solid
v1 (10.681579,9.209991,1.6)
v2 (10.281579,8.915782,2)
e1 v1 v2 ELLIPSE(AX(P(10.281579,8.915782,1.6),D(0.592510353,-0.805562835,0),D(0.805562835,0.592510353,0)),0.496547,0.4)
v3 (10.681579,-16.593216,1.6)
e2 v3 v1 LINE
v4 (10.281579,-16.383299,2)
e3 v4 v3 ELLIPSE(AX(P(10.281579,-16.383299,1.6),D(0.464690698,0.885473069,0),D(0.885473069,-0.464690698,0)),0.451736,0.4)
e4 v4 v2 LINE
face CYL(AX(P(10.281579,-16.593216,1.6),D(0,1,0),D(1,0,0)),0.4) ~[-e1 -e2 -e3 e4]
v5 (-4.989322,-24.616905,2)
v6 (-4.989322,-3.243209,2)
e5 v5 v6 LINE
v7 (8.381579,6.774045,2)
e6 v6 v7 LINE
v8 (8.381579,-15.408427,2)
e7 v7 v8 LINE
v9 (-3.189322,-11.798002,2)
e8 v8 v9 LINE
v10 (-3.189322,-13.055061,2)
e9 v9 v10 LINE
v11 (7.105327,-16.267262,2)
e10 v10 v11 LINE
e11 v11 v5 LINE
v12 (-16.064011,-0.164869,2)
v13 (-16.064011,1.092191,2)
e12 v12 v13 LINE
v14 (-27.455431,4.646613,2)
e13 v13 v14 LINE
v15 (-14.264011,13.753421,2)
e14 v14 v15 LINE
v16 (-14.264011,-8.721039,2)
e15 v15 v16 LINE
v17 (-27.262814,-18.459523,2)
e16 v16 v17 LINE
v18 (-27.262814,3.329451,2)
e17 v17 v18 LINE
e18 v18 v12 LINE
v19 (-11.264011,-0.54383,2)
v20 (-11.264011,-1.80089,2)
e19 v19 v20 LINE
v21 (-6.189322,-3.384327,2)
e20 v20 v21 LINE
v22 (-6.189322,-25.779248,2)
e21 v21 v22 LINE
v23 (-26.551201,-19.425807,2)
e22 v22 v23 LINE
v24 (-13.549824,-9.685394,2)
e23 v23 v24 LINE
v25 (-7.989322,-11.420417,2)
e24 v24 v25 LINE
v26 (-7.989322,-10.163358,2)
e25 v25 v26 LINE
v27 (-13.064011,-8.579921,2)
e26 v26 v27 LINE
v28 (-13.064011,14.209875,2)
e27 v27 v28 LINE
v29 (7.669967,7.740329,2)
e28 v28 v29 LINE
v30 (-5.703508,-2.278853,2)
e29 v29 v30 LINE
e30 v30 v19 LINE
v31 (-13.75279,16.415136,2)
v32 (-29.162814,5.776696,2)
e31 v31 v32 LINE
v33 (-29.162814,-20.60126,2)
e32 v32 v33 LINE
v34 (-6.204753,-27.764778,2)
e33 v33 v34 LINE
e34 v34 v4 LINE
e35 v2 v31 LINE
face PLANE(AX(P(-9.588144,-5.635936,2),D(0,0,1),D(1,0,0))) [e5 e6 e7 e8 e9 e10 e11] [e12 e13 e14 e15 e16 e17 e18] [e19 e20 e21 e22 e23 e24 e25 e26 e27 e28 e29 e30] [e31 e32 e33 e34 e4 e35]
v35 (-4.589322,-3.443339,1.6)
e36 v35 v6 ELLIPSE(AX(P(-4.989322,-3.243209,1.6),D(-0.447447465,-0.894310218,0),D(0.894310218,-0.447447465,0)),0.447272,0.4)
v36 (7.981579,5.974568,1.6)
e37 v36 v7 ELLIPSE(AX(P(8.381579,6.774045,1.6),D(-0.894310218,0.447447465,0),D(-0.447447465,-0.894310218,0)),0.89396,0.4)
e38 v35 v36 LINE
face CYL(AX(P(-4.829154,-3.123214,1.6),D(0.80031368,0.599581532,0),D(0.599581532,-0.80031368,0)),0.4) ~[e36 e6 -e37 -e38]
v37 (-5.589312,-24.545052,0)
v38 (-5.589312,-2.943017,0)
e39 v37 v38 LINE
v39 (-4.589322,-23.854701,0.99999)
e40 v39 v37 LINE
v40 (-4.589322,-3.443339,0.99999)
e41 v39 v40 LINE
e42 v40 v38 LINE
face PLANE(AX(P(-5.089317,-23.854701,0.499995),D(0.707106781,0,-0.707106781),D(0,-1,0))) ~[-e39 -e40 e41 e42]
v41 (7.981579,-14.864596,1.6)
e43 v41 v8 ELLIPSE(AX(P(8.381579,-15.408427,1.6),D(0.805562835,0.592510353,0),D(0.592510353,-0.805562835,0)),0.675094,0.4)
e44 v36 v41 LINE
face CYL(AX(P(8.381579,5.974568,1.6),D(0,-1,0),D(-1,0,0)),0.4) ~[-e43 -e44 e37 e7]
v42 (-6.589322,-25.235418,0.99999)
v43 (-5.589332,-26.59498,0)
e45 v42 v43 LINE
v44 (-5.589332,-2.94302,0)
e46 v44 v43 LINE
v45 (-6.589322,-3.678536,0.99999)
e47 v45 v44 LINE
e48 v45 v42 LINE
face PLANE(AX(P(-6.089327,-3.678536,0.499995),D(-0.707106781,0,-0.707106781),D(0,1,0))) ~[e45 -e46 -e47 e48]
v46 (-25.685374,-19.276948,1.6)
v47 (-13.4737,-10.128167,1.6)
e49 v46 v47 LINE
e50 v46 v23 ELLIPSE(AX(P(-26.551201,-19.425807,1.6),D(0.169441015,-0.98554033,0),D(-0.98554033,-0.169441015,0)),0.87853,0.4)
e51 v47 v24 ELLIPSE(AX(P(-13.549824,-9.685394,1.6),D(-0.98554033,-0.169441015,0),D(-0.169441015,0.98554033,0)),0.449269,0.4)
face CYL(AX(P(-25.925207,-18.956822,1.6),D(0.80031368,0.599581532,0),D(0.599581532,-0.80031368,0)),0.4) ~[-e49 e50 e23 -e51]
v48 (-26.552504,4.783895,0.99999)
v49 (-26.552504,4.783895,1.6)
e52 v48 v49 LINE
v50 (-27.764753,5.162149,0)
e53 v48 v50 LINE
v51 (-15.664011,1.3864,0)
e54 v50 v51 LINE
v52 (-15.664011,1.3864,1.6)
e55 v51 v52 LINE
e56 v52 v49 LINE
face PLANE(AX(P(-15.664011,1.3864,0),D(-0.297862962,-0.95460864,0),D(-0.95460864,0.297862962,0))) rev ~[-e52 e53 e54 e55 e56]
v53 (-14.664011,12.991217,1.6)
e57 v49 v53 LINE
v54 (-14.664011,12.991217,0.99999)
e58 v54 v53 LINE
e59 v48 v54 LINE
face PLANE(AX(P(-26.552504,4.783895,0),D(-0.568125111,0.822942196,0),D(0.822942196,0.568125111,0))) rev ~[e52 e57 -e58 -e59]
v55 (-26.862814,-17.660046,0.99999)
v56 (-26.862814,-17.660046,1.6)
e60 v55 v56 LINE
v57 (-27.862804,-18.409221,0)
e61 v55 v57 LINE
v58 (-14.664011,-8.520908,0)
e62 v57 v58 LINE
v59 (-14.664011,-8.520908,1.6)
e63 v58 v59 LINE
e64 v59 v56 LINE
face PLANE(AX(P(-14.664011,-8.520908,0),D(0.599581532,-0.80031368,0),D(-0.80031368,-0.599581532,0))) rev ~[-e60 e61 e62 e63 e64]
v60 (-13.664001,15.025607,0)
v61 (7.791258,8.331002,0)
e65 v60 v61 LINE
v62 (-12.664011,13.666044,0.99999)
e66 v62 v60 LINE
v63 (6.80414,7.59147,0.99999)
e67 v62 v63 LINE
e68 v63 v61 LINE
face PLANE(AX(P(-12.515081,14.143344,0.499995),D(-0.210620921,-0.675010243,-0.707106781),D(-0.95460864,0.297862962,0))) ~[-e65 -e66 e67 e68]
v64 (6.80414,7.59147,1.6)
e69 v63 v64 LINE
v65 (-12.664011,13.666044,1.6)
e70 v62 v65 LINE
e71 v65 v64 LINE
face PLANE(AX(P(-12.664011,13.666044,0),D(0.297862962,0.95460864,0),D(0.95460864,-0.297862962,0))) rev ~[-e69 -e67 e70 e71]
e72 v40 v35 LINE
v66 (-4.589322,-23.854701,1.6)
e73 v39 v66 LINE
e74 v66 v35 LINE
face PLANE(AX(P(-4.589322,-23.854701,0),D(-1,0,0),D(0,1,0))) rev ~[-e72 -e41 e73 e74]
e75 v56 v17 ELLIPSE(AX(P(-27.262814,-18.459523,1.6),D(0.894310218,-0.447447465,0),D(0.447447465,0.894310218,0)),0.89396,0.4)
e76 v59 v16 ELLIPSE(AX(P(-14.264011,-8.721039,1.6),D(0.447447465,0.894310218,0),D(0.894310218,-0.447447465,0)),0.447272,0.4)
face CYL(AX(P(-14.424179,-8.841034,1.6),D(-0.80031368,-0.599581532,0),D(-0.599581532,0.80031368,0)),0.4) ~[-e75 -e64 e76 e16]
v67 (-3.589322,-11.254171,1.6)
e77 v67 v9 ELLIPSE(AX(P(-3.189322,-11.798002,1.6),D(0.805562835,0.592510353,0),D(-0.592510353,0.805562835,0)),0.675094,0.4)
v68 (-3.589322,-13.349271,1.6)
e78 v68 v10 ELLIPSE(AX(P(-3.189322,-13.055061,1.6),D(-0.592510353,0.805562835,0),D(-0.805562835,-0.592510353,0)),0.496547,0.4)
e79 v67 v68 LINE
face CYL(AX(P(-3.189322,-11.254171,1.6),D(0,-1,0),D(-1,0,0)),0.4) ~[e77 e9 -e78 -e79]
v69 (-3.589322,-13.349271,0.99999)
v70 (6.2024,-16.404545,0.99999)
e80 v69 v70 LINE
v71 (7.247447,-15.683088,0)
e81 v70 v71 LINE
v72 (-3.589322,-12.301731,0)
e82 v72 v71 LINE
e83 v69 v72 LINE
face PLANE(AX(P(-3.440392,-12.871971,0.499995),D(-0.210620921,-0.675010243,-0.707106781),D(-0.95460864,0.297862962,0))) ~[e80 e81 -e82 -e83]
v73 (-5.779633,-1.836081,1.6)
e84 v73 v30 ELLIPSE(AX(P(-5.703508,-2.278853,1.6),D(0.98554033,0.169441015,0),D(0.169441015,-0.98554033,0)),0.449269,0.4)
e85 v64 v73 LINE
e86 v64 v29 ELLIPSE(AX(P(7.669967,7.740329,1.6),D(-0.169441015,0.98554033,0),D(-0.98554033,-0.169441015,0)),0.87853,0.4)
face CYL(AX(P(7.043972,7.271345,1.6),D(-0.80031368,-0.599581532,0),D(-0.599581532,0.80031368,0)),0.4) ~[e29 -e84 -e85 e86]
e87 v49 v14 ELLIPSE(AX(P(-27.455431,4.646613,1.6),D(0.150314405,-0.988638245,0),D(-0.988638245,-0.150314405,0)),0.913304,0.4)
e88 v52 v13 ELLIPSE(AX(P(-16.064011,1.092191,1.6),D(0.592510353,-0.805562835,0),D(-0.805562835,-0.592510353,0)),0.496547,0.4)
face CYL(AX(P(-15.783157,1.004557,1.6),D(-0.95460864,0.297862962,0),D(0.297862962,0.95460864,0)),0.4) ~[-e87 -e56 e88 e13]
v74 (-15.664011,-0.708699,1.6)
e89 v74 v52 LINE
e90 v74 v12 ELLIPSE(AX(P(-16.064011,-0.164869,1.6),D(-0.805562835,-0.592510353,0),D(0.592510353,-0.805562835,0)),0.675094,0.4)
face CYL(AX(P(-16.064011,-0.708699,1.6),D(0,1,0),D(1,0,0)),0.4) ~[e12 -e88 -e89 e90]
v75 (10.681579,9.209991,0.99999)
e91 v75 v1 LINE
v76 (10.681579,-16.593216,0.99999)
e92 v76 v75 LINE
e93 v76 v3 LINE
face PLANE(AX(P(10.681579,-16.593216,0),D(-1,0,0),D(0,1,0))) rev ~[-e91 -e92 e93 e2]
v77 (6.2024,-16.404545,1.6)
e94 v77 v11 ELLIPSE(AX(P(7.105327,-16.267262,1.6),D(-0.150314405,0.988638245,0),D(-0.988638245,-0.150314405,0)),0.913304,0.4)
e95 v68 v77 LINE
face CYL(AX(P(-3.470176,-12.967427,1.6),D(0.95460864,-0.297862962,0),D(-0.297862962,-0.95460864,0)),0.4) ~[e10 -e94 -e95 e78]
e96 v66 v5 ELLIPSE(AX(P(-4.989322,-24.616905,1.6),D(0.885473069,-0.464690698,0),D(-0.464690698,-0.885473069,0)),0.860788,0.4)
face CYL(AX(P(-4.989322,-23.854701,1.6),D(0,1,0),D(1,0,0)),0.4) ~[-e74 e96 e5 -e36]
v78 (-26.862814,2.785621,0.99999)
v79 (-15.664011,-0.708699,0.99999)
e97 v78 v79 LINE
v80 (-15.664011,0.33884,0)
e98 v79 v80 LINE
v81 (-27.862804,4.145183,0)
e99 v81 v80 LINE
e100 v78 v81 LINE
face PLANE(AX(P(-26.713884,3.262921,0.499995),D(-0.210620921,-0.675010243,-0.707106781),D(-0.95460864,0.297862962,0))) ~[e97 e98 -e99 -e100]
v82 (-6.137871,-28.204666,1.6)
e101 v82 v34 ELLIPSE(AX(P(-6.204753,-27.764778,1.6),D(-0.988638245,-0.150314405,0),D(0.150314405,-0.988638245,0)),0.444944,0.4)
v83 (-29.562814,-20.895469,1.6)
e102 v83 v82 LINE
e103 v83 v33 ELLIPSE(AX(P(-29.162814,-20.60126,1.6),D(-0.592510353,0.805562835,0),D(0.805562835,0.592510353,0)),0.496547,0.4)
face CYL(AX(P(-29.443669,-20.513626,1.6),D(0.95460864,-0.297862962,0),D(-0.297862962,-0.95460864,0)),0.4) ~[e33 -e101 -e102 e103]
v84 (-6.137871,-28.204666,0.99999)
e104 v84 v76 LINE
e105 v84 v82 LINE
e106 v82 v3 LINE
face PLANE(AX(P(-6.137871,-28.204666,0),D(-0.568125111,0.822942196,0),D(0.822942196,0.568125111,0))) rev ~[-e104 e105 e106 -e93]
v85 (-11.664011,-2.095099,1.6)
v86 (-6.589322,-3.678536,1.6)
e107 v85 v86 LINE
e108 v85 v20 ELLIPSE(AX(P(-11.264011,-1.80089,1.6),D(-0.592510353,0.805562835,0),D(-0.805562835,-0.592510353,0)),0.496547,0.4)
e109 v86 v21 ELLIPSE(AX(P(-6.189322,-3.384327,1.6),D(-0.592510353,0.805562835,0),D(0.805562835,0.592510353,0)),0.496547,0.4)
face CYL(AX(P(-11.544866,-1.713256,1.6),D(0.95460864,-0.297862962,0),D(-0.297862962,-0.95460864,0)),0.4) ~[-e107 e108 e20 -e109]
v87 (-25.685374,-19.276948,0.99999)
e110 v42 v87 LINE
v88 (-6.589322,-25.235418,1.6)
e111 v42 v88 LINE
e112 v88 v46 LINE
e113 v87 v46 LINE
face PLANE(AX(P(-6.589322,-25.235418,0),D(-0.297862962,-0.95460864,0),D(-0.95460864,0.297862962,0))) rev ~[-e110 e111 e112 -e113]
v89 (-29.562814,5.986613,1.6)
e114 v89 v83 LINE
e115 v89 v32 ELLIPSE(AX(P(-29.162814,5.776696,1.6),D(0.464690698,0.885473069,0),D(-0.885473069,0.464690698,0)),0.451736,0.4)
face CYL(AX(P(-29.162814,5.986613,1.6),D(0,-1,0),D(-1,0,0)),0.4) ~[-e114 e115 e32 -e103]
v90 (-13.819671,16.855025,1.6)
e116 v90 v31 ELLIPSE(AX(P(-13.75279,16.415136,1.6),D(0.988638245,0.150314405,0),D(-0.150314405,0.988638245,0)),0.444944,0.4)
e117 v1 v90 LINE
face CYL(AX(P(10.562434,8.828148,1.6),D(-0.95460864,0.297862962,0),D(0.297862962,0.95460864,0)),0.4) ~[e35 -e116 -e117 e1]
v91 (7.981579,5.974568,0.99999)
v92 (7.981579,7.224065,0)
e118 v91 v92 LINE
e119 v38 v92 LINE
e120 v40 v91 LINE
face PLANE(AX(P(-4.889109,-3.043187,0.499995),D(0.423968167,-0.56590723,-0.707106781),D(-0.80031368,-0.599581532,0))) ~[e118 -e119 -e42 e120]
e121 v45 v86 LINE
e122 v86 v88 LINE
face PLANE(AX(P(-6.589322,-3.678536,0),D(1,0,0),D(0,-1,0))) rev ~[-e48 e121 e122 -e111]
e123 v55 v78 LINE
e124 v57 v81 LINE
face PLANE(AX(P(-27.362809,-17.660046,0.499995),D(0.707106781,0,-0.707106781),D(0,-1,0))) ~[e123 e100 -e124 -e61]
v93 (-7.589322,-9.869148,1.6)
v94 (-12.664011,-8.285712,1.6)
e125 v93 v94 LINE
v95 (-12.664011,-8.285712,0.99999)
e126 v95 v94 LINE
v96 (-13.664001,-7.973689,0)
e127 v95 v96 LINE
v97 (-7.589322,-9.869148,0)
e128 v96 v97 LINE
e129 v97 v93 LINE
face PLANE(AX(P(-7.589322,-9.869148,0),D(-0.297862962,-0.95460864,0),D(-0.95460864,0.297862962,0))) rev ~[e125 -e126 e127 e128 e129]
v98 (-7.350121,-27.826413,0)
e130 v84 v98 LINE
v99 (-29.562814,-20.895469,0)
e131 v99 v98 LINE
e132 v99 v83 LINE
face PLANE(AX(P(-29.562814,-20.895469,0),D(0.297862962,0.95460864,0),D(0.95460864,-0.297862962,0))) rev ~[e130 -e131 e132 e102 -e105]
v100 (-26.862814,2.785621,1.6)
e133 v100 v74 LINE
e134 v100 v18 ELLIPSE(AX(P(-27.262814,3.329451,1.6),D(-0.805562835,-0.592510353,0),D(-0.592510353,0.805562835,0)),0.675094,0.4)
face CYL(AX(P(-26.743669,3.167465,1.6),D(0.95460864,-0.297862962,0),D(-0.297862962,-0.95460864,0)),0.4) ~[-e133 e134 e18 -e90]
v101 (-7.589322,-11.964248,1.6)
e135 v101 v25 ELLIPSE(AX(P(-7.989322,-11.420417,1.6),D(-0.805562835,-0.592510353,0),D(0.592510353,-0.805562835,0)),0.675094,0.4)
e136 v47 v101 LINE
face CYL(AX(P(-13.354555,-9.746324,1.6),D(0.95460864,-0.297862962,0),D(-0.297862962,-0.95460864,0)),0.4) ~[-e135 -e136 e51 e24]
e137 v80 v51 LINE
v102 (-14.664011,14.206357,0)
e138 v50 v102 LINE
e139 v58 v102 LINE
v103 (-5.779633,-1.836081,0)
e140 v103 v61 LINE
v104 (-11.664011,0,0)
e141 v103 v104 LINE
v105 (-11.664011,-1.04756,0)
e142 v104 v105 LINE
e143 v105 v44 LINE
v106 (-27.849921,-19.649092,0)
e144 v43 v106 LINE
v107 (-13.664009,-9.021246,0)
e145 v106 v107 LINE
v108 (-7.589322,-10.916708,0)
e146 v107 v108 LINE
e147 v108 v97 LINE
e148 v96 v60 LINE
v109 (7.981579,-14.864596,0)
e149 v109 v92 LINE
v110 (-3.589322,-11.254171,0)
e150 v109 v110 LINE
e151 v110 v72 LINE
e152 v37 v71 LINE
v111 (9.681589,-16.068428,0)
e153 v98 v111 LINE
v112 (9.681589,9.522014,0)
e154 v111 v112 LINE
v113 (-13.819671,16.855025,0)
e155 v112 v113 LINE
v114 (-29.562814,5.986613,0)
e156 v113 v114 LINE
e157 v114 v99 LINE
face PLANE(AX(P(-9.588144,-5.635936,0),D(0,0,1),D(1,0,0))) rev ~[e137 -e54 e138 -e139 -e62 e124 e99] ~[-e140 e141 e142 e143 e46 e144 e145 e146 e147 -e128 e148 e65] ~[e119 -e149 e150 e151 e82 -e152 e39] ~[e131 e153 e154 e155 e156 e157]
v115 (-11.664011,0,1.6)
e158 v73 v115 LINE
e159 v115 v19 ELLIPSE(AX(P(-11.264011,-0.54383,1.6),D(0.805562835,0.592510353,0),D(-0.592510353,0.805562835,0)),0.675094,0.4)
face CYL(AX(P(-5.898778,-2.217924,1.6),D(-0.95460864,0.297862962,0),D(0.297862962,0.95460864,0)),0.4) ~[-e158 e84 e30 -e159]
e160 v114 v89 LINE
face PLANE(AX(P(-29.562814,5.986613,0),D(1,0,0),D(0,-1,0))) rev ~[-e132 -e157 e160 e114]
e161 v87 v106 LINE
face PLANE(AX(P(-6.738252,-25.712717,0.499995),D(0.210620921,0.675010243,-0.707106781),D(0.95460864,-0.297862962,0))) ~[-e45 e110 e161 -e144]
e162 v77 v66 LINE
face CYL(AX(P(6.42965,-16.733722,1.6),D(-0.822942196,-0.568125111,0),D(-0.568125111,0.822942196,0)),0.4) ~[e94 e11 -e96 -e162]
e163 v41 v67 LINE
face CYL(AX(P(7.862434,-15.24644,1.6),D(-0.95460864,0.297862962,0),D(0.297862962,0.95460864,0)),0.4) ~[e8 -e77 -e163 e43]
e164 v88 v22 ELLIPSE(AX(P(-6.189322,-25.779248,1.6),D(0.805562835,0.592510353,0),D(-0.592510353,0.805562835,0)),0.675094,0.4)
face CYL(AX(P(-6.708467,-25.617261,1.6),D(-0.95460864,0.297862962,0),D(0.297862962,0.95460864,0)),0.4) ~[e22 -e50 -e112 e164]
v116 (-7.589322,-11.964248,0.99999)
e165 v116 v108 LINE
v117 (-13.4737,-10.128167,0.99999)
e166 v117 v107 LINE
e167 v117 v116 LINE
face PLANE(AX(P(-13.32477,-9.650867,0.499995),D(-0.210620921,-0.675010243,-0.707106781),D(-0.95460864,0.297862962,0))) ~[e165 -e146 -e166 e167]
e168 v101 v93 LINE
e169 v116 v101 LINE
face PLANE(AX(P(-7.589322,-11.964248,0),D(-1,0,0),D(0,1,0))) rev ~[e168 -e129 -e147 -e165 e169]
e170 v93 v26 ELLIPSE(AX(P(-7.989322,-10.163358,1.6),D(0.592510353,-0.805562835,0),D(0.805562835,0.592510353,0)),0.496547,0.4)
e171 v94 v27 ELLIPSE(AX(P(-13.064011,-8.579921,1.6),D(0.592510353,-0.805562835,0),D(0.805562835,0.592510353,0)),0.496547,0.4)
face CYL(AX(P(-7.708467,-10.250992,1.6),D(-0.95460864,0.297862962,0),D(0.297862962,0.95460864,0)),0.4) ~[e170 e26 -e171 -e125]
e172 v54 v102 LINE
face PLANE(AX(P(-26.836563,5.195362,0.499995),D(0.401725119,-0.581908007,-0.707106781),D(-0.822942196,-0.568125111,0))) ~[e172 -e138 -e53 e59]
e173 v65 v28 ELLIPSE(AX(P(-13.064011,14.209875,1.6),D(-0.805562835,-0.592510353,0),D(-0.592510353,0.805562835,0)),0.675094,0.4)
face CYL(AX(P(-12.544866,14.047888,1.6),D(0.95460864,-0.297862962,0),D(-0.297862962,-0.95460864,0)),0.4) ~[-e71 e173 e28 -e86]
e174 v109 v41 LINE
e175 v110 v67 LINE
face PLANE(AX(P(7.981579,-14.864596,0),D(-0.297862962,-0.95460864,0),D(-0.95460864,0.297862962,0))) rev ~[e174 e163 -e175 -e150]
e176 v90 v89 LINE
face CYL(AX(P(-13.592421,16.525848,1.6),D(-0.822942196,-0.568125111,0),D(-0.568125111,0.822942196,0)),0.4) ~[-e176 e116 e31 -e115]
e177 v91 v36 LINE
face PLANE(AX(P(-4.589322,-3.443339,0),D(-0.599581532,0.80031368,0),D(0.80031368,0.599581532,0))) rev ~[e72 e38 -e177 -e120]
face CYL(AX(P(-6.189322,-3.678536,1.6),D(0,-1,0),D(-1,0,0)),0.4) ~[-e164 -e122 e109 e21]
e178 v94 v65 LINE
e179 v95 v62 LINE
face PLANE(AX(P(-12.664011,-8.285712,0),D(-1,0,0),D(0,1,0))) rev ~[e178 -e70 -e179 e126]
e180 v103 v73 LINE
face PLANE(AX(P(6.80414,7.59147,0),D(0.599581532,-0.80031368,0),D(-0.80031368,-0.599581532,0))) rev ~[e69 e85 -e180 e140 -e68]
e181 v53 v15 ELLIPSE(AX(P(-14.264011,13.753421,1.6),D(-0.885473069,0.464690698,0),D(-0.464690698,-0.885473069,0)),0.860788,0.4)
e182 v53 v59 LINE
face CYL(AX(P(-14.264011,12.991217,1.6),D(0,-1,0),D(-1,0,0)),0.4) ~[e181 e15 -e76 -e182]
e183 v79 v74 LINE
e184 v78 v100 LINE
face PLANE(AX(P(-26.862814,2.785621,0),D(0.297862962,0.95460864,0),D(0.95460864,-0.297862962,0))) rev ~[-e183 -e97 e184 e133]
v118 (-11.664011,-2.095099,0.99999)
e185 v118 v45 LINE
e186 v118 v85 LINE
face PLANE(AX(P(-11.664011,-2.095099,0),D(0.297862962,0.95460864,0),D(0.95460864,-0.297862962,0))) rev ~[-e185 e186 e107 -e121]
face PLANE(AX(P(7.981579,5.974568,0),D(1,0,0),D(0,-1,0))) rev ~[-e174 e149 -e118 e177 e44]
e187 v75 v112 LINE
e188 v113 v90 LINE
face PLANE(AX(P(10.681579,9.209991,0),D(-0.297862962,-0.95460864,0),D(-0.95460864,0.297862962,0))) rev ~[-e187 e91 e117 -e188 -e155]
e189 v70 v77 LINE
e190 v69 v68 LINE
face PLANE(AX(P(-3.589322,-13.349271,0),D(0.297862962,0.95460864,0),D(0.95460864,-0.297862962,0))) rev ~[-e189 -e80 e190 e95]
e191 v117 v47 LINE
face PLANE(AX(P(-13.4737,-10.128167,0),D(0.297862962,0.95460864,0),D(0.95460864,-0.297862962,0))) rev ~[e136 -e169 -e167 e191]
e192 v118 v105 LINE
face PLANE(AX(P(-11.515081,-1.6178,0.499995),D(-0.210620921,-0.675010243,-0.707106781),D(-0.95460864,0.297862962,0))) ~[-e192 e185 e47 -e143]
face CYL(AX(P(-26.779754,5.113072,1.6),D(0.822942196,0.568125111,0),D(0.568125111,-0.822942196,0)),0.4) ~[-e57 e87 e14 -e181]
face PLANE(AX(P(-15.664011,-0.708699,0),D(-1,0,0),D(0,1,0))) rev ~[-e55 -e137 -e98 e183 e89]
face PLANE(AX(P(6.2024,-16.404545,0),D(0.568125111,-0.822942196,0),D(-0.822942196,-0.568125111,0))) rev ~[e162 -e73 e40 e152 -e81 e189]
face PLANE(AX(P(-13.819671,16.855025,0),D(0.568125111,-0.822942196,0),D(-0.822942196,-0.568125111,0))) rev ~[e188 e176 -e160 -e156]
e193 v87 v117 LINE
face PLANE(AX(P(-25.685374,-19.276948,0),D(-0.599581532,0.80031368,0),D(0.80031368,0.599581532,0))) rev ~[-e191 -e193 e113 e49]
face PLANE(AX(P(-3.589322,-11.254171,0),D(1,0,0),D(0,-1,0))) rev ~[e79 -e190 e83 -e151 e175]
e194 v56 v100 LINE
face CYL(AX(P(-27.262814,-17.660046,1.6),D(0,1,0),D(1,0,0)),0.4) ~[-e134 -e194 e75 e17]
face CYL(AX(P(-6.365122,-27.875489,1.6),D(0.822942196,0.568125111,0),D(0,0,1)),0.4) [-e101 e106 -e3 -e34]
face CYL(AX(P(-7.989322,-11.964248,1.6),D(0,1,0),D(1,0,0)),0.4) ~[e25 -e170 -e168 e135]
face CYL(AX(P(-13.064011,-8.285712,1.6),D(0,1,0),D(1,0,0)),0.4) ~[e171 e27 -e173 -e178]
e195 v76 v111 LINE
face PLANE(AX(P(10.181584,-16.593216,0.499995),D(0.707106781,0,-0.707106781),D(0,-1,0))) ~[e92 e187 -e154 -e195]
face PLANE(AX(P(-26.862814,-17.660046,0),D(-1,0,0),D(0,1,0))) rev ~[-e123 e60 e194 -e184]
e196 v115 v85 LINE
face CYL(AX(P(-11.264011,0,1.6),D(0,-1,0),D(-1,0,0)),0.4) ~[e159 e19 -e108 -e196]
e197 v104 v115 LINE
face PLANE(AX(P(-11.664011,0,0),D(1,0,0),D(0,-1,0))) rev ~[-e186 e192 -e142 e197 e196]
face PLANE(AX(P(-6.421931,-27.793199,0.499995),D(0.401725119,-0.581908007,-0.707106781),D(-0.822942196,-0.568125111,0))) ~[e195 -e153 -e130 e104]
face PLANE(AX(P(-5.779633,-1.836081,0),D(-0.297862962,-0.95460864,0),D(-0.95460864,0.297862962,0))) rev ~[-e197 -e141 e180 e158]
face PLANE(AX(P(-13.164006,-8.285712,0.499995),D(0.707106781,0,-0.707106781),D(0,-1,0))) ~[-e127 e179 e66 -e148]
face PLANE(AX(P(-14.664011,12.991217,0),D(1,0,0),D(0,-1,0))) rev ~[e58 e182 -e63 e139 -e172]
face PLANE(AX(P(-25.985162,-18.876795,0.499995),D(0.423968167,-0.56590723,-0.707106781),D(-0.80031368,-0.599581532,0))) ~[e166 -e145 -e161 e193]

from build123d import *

# Parameters (mm, degrees)
F1_DEPTH = 2
F2_SIZE  = 0.99999
F3_R     = 0.4


# Not quite as in the source:
# - a fillet or chamfer is up to 0.001 mm smaller than in the source, because OpenCascade refuses the exact size
# - a feature names something its author has since deleted; it is built from what else it names


with BuildPart() as f1:
    # F0 (on Top) → F1 (new body)
    with BuildSketch(Plane.XY):
        Polygon((-13.8196714956, 16.8550248196), (-29.5628140081, 5.986613122), (-29.5628140081, -20.895469086), (-6.1378714726, -28.2046662626), (10.6815792442, -16.5932160853), (10.6815792442, 9.2099912209), align=None)
        Polygon((-5.5893215574, -24.5450593134), (-6.5893215574, -25.2354177783), (-25.6853743411, -19.2769478747), (-26.8628140101, -18.9095557801), (-26.8628140101, -17.6600457129), (-26.8628140101, 2.7856210558), (-26.8628140101, 4.569670104), (-26.5525036512, 4.783895487), (-14.6640113722, 12.9912167666), (-13.6640113722, 13.6815752315), (-13.3682214107, 13.8857763353), (-12.6640113722, 13.6660443117), (6.8041395773, 7.5914700096), (7.9815792463, 7.224077915), (7.9815792463, 5.9745678478), (7.9815792463, -14.864596124), (7.9815792463, -15.1762730673), (7.5702731242, -15.4602217303), (6.2023996294, -16.4045447763), (-4.5893215574, -23.8547008485), align=None, mode=Mode.SUBTRACT)
        Polygon((-26.8628140101, 4.569670104), (-26.8628140101, 2.7856210558), (-15.6640113722, -0.7086994318), (-15.6640113722, 1.3863999797), (-26.5525036512, 4.783895487), align=None)
        with BuildLine():
            Line((-13.6640113722, 13.6815752315), (-13.6640113722, -8.0212351043))
            ThreePointArc((-13.6640113722, -8.0212351043), (-13.5133605177, -8.0326480722), (-13.3661484098, -8.0666264642))
            Line((-13.3661484098, -8.0666264642), (-12.6640113722, -8.2857116571))
            Line((-12.6640113722, -8.2857116571), (-12.6640113722, 13.6660443117))
            Line((-12.6640113722, 13.6660443117), (-13.3682214107, 13.8857763353))
            Line((-13.3682214107, 13.8857763353), (-13.6640113722, 13.6815752315))
        make_face()
        with BuildLine():
            Line((-14.6640113722, 12.9912167666), (-14.6640113722, -8.5209081976))
            Line((-14.6640113722, -8.5209081976), (-14.2635929044, -8.2209214243))
            ThreePointArc((-14.2635929044, -8.2209214243), (-13.9799910551, -8.0724691479), (-13.6640113722, -8.0212351043))
            Line((-13.6640113722, -8.0212351043), (-13.6640113722, 13.6815752315))
            Line((-13.6640113722, 13.6815752315), (-14.6640113722, 12.9912167666))
        make_face()
        with BuildLine():
            Line((-6.5893215574, -3.6785358878), (-6.5893215574, -25.2354177783))
            Line((-6.5893215574, -25.2354177783), (-5.5893215574, -24.5450593134))
            Line((-5.5893215574, -24.5450593134), (-5.5893215574, -3.9430124406))
            ThreePointArc((-5.5893215574, -3.9430124406), (-5.739972412, -3.9315994727), (-5.8871845198, -3.8976210807))
            Line((-5.8871845198, -3.8976210807), (-6.5893215574, -3.6785358878))
        make_face()
        with BuildLine():
            Line((-5.5893215574, -3.9430124406), (-5.5893215574, -24.5450593134))
            Line((-5.5893215574, -24.5450593134), (-4.5893215574, -23.8547008485))
            Line((-4.5893215574, -23.8547008485), (-4.5893215574, -3.4433393473))
            Line((-4.5893215574, -3.4433393473), (-4.9897400253, -3.7433261206))
            ThreePointArc((-4.9897400253, -3.7433261206), (-5.2733418745, -3.891778397), (-5.5893215574, -3.9430124406))
        make_face()
        with BuildLine():
            ThreePointArc((-5.2914585951, -1.9884038006), (-5.0122521974, -2.1263172994), (-4.7890078775, -2.3434309085))
            Line((-4.7890078775, -2.3434309085), (7.9815792463, 7.224077915))
            Line((7.9815792463, 7.224077915), (6.8041395773, 7.5914700096))
            Line((6.8041395773, 7.5914700096), (-5.7796330622, -1.8360805481))
            Line((-5.7796330622, -1.8360805481), (-5.2914585951, -1.9884038006))
        make_face()
        with BuildLine():
            Line((-4.5893215574, -2.9430124406), (-4.5893215574, -3.4433393473))
            Line((-4.5893215574, -3.4433393473), (7.9815792463, 5.9745678478))
            Line((7.9815792463, 5.9745678478), (7.9815792463, 7.224077915))
            Line((7.9815792463, 7.224077915), (-4.7890078775, -2.3434309085))
            ThreePointArc((-4.7890078775, -2.3434309085), (-4.6405556011, -2.6270327577), (-4.5893215574, -2.9430124406))
        make_face()
        with BuildLine():
            Line((-26.8628140101, -18.9095557801), (-25.6853743411, -19.2769478747))
            Line((-25.6853743411, -19.2769478747), (-13.4736998674, -10.1281669968))
            Line((-13.4736998674, -10.1281669968), (-13.9618743346, -9.9758437443))
            ThreePointArc((-13.9618743346, -9.9758437443), (-14.2410807322, -9.8379302455), (-14.4643250521, -9.6208166364))
            Line((-14.4643250521, -9.6208166364), (-26.8628140101, -18.9095557801))
        make_face()
        with BuildLine():
            Line((-26.8628140101, -17.6600457129), (-26.8628140101, -18.9095557801))
            Line((-26.8628140101, -18.9095557801), (-14.4643250521, -9.6208166364))
            ThreePointArc((-14.4643250521, -9.6208166364), (-14.6127773286, -9.3372147872), (-14.6640113722, -9.0212351043))
            Line((-14.6640113722, -9.0212351043), (-14.6640113722, -8.5209081976))
            Line((-14.6640113722, -8.5209081976), (-26.8628140101, -17.6600457129))
        make_face()
        Polygon((-3.5893215574, -13.3492706494), (6.2023996294, -16.4045447763), (7.5702731242, -15.4602217303), (-3.5893215574, -11.9781351546), align=None)
        with BuildLine():
            Line((-11.6640113722, -2.0950994115), (-6.5893215574, -3.6785358878))
            Line((-6.5893215574, -3.6785358878), (-6.5893215574, -2.9430124406))
            ThreePointArc((-6.5893215574, -2.9430124406), (-6.4836317755, -2.4955649757), (-6.1889030896, -2.1426987607))
            Line((-6.1889030896, -2.1426987607), (-5.7796330622, -1.8360805481))
            Line((-5.7796330622, -1.8360805481), (-11.6640113722, 0))
            Line((-11.6640113722, 0), (-11.6640113722, -2.0950994115))
        make_face()
        with BuildLine():
            Line((-13.06442984, -9.8215487842), (-13.4736998674, -10.1281669968))
            Line((-13.4736998674, -10.1281669968), (-7.5893215574, -11.9642475449))
            Line((-7.5893215574, -11.9642475449), (-7.5893215574, -9.8691481334))
            Line((-7.5893215574, -9.8691481334), (-12.6640113722, -8.2857116571))
            Line((-12.6640113722, -8.2857116571), (-12.6640113722, -9.0212351043))
            ThreePointArc((-12.6640113722, -9.0212351043), (-12.7697011542, -9.4686825693), (-13.06442984, -9.8215487842))
        make_face()
        Polygon((-3.5893215574, -11.9781351546), (7.5702731242, -15.4602217303), (7.9815792463, -15.1762730673), (7.9815792463, -14.864596124), (-3.5893215574, -11.2541712379), align=None)
        with BuildLine():
            ThreePointArc((-5.8871845198, -3.8976210807), (-5.739972412, -3.9315994727), (-5.5893215574, -3.9430124406))
            Line((-5.5893215574, -3.9430124406), (-5.5893215574, -2.9430124406))
            Line((-5.5893215574, -2.9430124406), (-4.7890078775, -2.3434309085))
            ThreePointArc((-4.7890078775, -2.3434309085), (-5.0122521974, -2.1263172994), (-5.2914585951, -1.9884038006))
            ThreePointArc((-5.2914585951, -1.9884038006), (-5.7587625723, -1.9574721104), (-6.1889030896, -2.1426987607))
            ThreePointArc((-6.1889030896, -2.1426987607), (-6.4836317755, -2.4955649757), (-6.5893215574, -2.9430124406))
            ThreePointArc((-6.5893215574, -2.9430124406), (-6.3948843925, -3.535522794), (-5.8871845198, -3.8976210807))
        make_face()
        with BuildLine():
            Line((-13.6640113722, -9.0212351043), (-14.4643250521, -9.6208166364))
            ThreePointArc((-14.4643250521, -9.6208166364), (-14.2410807322, -9.8379302455), (-13.9618743346, -9.9758437443))
            ThreePointArc((-13.9618743346, -9.9758437443), (-13.4945703573, -10.0067754345), (-13.06442984, -9.8215487842))
            ThreePointArc((-13.06442984, -9.8215487842), (-12.7697011542, -9.4686825693), (-12.6640113722, -9.0212351043))
            ThreePointArc((-12.6640113722, -9.0212351043), (-12.8584485372, -8.4287247509), (-13.3661484098, -8.0666264642))
            ThreePointArc((-13.3661484098, -8.0666264642), (-13.5133605177, -8.0326480722), (-13.6640113722, -8.0212351043))
            Line((-13.6640113722, -8.0212351043), (-13.6640113722, -9.0212351043))
        make_face()
        with BuildLine():
            Line((-5.5893215574, -2.9430124406), (-5.5893215574, -3.9430124406))
            ThreePointArc((-5.5893215574, -3.9430124406), (-5.2733418745, -3.891778397), (-4.9897400253, -3.7433261206))
            ThreePointArc((-4.9897400253, -3.7433261206), (-4.6950113394, -3.3904599056), (-4.5893215574, -2.9430124406))
            ThreePointArc((-4.5893215574, -2.9430124406), (-4.6405556011, -2.6270327577), (-4.7890078775, -2.3434309085))
            Line((-4.7890078775, -2.3434309085), (-5.5893215574, -2.9430124406))
        make_face()
        with BuildLine():
            ThreePointArc((-14.6640113722, -9.0212351043), (-14.6127773286, -9.3372147872), (-14.4643250521, -9.6208166364))
            Line((-14.4643250521, -9.6208166364), (-13.6640113722, -9.0212351043))
            Line((-13.6640113722, -9.0212351043), (-13.6640113722, -8.0212351043))
            ThreePointArc((-13.6640113722, -8.0212351043), (-13.9799910551, -8.0724691479), (-14.2635929044, -8.2209214243))
            ThreePointArc((-14.2635929044, -8.2209214243), (-14.5583215902, -8.5737876393), (-14.6640113722, -9.0212351043))
        make_face()
        with BuildLine():
            Line((-6.5893215574, -2.9430124406), (-6.5893215574, -3.6785358878))
            Line((-6.5893215574, -3.6785358878), (-5.8871845198, -3.8976210807))
            ThreePointArc((-5.8871845198, -3.8976210807), (-6.3948843925, -3.535522794), (-6.5893215574, -2.9430124406))
        make_face()
        with BuildLine():
            ThreePointArc((-13.3661484098, -8.0666264642), (-12.8584485372, -8.4287247509), (-12.6640113722, -9.0212351043))
            Line((-12.6640113722, -9.0212351043), (-12.6640113722, -8.2857116571))
            Line((-12.6640113722, -8.2857116571), (-13.3661484098, -8.0666264642))
        make_face()
        with BuildLine():
            Line((-13.9618743346, -9.9758437443), (-13.4736998674, -10.1281669968))
            Line((-13.4736998674, -10.1281669968), (-13.06442984, -9.8215487842))
            ThreePointArc((-13.06442984, -9.8215487842), (-13.4945703573, -10.0067754345), (-13.9618743346, -9.9758437443))
        make_face()
        with BuildLine():
            Line((-5.7796330622, -1.8360805481), (-6.1889030896, -2.1426987607))
            ThreePointArc((-6.1889030896, -2.1426987607), (-5.7587625723, -1.9574721104), (-5.2914585951, -1.9884038006))
            Line((-5.2914585951, -1.9884038006), (-5.7796330622, -1.8360805481))
        make_face()
        with BuildLine():
            Line((-4.9897400253, -3.7433261206), (-4.5893215574, -3.4433393473))
            Line((-4.5893215574, -3.4433393473), (-4.5893215574, -2.9430124406))
            ThreePointArc((-4.5893215574, -2.9430124406), (-4.6950113394, -3.3904599056), (-4.9897400253, -3.7433261206))
        make_face()
        with BuildLine():
            Line((-14.2635929044, -8.2209214243), (-14.6640113722, -8.5209081976))
            Line((-14.6640113722, -8.5209081976), (-14.6640113722, -9.0212351043))
            ThreePointArc((-14.6640113722, -9.0212351043), (-14.5583215902, -8.5737876393), (-14.2635929044, -8.2209214243))
        make_face()
    extrude(amount=F1_DEPTH)

    # F2 (size 1 in the source; OpenCascade refuses exactly that, so slightly less here)
    f2_edges = [f1.edges().sort_by_distance(p)[0] for p in [
        (-6.589322, -14.456977, 0),
        (-12.664011, 2.690166, 0),
        (-20.608258, 8.887556, 0),
        (-26.862814, -7.437212, 0),
        (-21.263413, 1.038461, 0),
        (-19.579537, -14.702557, 0),
        (1.306539, -14.876908, 0),
        (-10.531511, -11.046207, 0),
        (-9.126666, -2.886818, 0),
        (-4.589322, -13.64902, 0),
        (1.696129, 1.265614, 0),
        (10.681579, -3.691612, 0),
        (-2.929936, 10.628757, 0),
        (2.271854, -22.398941, 0),
        (-16.137348, -22.256183, 0),
    ]]
    chamfer(f2_edges, length=F2_SIZE)

    # F3
    f3_edges = [f1.edges().sort_by_distance(p)[0] for p in [
        (-17.850343, -24.550068, 2),
        (2.271854, -22.398941, 2),
        (10.681579, -3.691612, 2),
        (-1.569046, 13.032508, 2),
        (-21.691243, 11.420819, 2),
        (-29.562814, -7.454428, 2),
        (7.981579, -4.445014, 2),
        (0.806539, -20.129623, 2),
        (-16.137348, -22.256183, 2),
        (-26.862814, -7.437212, 2),
        (-21.263413, 1.038461, 2),
        (-21.108258, 3.085148, 2),
        (-14.664011, 2.235154, 2),
        (-12.664011, 2.690166, 2),
        (1.696129, 1.265614, 2),
        (0.512253, 2.877695, 2),
        (-4.589322, -13.64902, 2),
        (2.196129, -13.059384, 2),
        (-3.589322, -12.301721, 2),
        (1.306539, -14.876908, 2),
        (-20.763413, -13.090477, 2),
        (-15.664011, 0.33885, 2),
        (-20.608258, 8.887556, 2),
        (-8.721822, -0.91804, 2),
        (-11.664011, -1.04755, 2),
        (-9.126666, -2.886818, 2),
        (-6.589322, -14.456977, 2),
        (-19.579537, -14.702557, 2),
        (-10.531511, -11.046207, 2),
        (-7.589322, -10.916698, 2),
        (-10.126666, -9.07743, 2),
        (-2.929936, 10.628757, 2),
    ]]
    fillet(f3_edges, radius=F3_R)


solid = f1.part
